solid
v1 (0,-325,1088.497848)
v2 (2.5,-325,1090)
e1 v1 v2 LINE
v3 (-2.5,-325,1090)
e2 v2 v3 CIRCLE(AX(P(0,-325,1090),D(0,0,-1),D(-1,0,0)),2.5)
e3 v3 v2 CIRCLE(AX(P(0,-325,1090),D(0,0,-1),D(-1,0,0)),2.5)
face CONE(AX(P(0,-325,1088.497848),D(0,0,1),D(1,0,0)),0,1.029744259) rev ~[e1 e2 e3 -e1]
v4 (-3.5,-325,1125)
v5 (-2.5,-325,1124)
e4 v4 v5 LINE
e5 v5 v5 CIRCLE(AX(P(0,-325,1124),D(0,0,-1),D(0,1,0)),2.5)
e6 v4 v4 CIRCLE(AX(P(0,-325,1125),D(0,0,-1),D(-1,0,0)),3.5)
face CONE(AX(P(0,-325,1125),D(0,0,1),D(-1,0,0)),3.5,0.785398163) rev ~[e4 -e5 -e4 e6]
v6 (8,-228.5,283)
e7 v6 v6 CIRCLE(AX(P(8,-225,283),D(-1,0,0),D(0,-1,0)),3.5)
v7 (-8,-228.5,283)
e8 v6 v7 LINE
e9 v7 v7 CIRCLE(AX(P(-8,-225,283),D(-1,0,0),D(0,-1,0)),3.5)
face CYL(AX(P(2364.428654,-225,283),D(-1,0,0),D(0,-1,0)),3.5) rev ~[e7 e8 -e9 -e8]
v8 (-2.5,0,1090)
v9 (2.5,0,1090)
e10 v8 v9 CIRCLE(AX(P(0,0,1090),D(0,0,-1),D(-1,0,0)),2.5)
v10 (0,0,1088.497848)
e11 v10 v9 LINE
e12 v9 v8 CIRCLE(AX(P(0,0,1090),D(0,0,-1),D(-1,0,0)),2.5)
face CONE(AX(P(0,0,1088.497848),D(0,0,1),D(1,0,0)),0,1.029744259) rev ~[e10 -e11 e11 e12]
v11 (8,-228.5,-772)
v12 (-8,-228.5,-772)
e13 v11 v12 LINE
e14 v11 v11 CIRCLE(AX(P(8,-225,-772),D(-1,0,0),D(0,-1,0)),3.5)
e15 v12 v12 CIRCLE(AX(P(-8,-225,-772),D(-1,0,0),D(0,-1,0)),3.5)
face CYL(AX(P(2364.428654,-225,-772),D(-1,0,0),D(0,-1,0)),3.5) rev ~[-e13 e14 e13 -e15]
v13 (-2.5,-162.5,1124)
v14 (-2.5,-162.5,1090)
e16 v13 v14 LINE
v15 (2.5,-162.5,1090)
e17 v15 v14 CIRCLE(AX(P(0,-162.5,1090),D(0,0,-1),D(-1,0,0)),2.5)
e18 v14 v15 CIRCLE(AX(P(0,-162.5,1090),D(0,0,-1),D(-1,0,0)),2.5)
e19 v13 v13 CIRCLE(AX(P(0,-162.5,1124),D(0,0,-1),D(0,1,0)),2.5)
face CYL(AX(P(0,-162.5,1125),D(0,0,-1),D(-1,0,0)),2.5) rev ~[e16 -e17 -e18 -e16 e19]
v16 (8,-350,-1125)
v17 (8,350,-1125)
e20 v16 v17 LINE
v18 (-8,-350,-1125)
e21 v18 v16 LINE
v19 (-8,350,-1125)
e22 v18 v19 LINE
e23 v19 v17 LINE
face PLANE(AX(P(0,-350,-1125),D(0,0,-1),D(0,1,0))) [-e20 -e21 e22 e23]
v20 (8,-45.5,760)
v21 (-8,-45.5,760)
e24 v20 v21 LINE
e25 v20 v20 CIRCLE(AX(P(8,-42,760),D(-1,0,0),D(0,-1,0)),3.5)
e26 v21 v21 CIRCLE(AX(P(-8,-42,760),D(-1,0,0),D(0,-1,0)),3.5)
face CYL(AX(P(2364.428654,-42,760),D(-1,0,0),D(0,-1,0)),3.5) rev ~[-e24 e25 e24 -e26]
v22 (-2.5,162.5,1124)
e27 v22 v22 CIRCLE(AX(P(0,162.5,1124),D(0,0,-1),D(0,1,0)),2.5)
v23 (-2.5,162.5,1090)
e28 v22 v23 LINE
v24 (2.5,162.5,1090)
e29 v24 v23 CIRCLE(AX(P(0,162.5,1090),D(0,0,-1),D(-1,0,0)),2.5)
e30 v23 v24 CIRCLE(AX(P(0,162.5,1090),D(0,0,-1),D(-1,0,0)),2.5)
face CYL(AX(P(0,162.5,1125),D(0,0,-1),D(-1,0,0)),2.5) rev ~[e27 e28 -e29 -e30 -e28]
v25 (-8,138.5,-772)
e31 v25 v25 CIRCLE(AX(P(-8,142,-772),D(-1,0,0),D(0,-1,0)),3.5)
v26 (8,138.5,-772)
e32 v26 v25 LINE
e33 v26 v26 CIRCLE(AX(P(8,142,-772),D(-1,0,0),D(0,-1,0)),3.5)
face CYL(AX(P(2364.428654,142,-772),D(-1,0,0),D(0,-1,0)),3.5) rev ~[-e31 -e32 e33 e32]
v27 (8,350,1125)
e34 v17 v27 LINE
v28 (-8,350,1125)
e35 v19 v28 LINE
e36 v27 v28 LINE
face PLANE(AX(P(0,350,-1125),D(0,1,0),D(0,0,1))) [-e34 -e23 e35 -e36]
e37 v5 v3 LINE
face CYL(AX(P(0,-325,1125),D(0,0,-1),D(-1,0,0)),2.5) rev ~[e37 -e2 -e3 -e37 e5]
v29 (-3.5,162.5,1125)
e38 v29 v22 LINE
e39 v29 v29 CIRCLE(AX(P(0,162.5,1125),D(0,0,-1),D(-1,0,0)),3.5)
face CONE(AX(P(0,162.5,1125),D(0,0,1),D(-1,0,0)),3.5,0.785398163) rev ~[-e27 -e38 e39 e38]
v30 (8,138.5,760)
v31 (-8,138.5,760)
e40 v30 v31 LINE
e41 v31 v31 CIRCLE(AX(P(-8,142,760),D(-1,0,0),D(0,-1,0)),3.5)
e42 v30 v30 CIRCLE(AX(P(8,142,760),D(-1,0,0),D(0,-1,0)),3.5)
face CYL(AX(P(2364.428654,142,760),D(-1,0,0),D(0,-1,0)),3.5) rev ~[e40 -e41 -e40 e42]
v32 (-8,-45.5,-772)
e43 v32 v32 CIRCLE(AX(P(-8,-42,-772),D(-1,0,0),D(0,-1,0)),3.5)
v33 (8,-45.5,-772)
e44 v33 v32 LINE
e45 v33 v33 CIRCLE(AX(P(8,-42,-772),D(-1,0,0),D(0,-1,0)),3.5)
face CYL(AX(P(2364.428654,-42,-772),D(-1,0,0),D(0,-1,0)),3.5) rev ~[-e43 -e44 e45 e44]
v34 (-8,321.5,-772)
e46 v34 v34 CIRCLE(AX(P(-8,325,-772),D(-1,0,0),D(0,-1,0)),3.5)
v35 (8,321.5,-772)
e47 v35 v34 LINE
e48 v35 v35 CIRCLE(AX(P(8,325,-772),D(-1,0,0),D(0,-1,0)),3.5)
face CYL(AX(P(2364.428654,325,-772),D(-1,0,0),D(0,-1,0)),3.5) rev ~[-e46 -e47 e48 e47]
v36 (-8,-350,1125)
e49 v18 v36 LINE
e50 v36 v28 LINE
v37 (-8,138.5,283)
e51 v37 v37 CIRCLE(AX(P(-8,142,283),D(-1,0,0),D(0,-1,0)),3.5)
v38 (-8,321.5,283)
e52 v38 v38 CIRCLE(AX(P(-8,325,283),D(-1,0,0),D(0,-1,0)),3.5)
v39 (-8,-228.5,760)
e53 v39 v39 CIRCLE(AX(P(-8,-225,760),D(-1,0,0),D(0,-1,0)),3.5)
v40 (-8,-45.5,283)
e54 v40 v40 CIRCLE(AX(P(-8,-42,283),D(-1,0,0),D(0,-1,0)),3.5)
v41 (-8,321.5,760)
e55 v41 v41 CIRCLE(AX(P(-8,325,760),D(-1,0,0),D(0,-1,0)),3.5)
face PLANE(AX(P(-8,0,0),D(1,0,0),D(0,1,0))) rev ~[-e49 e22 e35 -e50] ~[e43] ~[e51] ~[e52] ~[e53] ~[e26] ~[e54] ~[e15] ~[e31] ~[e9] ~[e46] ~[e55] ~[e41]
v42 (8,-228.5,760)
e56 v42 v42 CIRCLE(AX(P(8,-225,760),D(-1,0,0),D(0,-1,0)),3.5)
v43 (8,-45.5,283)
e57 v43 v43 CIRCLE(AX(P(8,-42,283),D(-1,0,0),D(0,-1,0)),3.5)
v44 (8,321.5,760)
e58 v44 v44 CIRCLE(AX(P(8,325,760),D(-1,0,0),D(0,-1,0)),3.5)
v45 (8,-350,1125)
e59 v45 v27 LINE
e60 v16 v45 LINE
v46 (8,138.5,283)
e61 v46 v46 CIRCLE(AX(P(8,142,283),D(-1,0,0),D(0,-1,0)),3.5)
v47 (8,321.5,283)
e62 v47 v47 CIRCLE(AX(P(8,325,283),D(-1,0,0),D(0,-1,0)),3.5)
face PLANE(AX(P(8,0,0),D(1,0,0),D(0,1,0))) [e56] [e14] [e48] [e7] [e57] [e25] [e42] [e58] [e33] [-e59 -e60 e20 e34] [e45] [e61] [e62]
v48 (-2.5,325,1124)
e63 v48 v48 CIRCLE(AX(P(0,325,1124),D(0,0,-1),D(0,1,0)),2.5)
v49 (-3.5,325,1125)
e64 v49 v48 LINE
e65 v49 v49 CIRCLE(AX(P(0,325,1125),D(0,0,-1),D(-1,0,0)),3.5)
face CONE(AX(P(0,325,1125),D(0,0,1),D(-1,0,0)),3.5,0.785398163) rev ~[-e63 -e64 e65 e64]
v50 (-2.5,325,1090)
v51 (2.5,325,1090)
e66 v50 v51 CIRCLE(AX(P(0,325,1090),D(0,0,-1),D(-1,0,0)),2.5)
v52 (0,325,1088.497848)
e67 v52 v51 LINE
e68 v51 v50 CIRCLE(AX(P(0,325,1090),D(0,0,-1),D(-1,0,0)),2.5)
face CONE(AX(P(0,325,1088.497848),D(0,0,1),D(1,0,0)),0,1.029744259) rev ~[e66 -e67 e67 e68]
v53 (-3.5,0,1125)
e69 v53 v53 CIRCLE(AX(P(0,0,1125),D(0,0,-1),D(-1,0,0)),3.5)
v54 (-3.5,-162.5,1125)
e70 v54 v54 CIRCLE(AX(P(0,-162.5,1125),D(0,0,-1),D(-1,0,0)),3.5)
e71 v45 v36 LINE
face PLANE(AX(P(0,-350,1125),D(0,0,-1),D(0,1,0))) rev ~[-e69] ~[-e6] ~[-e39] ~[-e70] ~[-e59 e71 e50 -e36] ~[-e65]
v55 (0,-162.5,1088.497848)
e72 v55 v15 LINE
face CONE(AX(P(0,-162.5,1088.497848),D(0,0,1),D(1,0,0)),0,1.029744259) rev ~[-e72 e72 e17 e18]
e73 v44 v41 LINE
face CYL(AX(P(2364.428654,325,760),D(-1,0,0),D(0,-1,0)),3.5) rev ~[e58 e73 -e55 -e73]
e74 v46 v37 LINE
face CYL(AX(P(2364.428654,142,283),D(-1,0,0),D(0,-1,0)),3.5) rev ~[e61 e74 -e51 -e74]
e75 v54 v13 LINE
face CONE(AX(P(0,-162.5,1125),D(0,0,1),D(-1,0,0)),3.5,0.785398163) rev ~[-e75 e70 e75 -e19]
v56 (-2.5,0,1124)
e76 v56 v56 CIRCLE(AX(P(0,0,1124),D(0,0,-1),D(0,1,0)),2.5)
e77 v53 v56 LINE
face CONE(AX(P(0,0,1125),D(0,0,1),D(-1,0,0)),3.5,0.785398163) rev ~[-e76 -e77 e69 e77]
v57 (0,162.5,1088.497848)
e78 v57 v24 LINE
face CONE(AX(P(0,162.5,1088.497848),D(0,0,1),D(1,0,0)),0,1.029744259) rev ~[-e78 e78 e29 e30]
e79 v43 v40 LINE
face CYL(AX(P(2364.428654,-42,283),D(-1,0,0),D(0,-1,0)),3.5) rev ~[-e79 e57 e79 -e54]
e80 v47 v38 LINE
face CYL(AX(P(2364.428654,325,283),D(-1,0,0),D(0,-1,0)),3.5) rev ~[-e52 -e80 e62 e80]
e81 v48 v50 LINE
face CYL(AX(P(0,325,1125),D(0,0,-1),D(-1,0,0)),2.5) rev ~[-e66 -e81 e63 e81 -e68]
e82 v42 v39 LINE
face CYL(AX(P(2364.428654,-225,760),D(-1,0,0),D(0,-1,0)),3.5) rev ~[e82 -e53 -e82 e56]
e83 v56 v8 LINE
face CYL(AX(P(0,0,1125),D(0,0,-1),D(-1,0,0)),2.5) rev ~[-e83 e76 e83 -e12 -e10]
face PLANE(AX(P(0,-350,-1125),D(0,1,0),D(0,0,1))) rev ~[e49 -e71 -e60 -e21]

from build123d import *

# Parameters (mm, degrees)
F0_W           = 700
F0_H           = 2250
F1_DEPTH       = 8
F3_D           = 5
F3_DEPTH       = 35
F3_CSINK_D     = 7
F3_CSINK_ANGLE = 90
F3_TIP         = 1.5021515476
F5_D           = 7


# Not quite as in the source:
# - a feature names something its author has since deleted; it is built from what else it names


with BuildPart() as f1:
    # F0 (on Right) → F1 (new body, symmetric)
    with BuildSketch(Plane.YZ):
        Rectangle(F0_W, F0_H)
    extrude(amount=F1_DEPTH, both=True)

    # F3
    with Locations(Plane.XY.offset(1125)):
        with Locations((0, 325), (0, 162.5), (0, 0), (0, -162.5), (0, -325)):
            CounterSinkHole(F3_D / 2, F3_CSINK_D / 2, depth=F3_DEPTH, counter_sink_angle=F3_CSINK_ANGLE)
            with Locations((0, 0, -(F3_DEPTH + F3_TIP / 2))):  # 118° drill point
                Cone(0, F3_D / 2, F3_TIP, mode=Mode.SUBTRACT)

    # F5 (through all)
    with Locations(Plane.YZ.offset(8)):
        with Locations((-225, 760), (-42, 760), (142, 760), (325, 760), (325, 283), (142, 283), (-42, 283), (-225, 283), (325, -772), (142, -772), (-42, -772), (-225, -772)):
            Hole(F5_D / 2)


solid = f1.part
